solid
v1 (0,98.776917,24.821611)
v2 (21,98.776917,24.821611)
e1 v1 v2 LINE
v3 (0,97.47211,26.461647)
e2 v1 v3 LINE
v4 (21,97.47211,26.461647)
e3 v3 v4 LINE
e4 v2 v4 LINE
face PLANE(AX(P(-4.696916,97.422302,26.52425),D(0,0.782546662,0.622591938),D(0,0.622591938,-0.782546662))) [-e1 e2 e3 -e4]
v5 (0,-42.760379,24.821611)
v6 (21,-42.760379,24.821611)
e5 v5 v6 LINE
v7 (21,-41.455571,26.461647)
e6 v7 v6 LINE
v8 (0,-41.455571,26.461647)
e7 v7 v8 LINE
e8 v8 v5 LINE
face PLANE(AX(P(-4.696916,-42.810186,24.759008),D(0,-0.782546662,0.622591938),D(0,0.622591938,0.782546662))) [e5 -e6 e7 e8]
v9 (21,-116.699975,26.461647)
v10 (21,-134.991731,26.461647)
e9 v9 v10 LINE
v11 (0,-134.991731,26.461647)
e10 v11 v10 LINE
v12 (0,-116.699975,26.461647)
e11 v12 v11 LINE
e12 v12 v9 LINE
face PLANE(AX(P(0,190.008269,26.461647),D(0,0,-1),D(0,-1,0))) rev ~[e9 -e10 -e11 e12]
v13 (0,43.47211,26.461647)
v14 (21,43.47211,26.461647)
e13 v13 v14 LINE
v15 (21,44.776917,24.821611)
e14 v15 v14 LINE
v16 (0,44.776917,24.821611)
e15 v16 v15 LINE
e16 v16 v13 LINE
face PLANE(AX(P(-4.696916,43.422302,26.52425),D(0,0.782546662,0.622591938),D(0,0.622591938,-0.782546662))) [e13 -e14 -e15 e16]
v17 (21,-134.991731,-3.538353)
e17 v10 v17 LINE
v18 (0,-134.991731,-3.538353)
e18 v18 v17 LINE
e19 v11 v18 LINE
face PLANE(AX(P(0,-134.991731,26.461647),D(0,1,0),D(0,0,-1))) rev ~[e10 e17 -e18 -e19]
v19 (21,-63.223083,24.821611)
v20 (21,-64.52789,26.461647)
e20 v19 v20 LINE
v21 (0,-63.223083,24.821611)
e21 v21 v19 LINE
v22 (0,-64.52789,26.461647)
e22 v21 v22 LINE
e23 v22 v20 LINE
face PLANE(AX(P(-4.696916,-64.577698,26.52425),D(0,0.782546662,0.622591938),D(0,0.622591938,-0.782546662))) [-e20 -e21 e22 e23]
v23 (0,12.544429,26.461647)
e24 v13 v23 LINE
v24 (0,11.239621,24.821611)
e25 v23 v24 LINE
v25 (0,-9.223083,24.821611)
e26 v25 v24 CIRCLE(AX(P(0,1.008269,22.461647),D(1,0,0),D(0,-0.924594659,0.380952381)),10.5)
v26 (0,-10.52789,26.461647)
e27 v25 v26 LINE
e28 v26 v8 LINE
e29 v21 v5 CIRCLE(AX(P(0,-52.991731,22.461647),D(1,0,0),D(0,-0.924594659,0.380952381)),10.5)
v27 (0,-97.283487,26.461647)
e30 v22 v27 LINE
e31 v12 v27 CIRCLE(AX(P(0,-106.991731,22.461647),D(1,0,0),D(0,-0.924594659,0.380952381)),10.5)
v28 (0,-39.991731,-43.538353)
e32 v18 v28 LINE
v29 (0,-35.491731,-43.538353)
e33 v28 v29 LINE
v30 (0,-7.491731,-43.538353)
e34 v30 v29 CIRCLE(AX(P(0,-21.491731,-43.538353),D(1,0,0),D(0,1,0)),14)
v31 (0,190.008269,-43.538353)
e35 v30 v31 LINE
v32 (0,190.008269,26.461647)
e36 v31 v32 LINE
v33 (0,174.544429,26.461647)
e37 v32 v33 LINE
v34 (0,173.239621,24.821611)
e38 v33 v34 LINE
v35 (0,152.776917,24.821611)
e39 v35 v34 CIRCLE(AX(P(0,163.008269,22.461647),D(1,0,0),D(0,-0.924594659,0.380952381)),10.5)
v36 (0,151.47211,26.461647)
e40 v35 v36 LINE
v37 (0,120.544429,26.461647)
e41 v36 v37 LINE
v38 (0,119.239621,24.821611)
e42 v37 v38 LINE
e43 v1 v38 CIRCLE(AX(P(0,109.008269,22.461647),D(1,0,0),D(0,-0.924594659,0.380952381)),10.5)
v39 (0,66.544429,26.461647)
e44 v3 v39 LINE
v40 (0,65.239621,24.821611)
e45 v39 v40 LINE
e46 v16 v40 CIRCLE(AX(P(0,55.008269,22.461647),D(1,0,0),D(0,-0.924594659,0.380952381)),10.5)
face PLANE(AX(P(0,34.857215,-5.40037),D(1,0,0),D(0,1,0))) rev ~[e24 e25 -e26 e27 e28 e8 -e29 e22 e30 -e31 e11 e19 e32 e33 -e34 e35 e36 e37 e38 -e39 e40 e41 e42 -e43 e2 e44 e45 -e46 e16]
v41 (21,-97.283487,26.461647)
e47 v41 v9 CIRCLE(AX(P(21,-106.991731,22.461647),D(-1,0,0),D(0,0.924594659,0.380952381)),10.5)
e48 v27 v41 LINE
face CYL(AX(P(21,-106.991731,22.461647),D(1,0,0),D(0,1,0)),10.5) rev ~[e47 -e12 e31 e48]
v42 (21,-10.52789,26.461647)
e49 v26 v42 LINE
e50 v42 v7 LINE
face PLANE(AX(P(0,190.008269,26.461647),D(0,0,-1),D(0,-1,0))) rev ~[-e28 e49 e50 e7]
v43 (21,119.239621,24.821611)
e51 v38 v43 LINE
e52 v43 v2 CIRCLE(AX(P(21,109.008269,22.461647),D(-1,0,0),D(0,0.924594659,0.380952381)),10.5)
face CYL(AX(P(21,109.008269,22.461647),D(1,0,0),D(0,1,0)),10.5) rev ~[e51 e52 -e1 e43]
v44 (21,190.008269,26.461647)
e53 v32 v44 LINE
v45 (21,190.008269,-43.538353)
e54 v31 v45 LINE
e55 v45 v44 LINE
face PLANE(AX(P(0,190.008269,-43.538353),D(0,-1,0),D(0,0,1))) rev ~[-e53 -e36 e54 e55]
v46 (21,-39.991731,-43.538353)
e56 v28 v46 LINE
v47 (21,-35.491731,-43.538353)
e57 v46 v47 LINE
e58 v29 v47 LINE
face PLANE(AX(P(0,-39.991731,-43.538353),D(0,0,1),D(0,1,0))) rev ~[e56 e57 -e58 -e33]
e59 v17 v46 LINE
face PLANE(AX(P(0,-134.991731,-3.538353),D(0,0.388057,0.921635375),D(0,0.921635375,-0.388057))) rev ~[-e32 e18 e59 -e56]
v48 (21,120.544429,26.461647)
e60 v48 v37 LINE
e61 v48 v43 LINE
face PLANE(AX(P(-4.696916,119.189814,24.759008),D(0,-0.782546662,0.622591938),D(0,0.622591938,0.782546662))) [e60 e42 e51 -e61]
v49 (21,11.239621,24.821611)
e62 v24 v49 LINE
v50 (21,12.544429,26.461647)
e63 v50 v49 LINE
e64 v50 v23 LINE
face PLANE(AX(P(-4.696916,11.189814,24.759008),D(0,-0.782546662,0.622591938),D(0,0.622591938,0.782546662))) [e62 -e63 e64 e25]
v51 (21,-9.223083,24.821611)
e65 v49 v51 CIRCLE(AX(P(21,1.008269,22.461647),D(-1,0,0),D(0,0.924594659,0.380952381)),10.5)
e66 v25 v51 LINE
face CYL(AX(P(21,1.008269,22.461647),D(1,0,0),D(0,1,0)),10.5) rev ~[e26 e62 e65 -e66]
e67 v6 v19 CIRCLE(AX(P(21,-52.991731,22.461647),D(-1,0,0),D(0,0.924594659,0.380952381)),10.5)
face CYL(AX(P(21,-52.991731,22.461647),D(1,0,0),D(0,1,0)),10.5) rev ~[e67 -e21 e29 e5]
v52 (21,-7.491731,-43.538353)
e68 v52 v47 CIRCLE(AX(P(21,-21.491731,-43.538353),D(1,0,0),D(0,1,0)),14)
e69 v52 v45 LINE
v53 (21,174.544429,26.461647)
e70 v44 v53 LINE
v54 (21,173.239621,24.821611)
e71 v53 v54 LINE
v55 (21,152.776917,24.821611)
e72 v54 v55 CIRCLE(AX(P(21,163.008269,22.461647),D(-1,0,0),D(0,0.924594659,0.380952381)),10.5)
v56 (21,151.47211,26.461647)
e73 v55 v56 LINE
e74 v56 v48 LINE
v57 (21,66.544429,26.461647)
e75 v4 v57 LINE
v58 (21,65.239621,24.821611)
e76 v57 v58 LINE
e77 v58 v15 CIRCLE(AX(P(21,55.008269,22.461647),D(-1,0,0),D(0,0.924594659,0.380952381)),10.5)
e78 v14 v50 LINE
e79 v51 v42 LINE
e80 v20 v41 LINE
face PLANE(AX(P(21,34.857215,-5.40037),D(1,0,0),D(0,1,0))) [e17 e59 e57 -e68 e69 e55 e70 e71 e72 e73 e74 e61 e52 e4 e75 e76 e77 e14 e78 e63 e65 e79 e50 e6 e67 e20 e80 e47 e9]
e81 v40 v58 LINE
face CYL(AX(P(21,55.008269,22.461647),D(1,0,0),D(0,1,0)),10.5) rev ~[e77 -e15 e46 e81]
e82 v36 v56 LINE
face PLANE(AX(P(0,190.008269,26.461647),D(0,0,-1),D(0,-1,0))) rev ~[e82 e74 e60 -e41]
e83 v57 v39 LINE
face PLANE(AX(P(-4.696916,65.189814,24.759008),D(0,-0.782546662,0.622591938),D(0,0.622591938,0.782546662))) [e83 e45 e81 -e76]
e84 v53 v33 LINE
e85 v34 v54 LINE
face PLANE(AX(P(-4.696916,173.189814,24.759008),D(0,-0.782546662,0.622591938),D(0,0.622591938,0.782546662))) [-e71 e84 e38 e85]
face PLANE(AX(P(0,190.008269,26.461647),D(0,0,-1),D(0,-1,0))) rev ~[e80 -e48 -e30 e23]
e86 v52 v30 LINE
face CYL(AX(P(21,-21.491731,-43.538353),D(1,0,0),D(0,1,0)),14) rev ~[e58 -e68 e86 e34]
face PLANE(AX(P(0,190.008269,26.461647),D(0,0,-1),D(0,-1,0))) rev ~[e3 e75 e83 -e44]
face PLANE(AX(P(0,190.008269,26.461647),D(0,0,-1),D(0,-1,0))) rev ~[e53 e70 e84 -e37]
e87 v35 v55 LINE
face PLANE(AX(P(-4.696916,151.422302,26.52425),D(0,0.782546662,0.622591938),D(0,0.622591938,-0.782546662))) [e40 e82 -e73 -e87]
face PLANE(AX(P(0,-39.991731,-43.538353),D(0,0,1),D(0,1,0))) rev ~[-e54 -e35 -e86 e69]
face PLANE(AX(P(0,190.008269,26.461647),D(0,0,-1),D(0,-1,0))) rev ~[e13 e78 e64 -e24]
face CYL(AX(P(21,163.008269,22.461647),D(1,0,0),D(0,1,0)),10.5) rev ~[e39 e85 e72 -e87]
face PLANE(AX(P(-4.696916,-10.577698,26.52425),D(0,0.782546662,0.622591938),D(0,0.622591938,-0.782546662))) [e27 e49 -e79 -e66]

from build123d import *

# Parameters (mm, degrees)
F1_DEPTH    = 21
F2_R        = 10.5
F3_DEPTH    = 25
F4_T1_DEPTH = 30.3938312155
F5_R        = 14
F6_DEPTH    = 25


# Not quite as in the source:
# - a fillet or chamfer that OpenCascade refuses, or shapes differently, is made with other operations: its cross-section is extruded or revolved along the edge and cut away or added


with BuildPart() as f1:
    # F0 (on Right) → F1 (new body)
    with BuildSketch(Plane.YZ):
        Polygon((-134.9917307664, 26.4616465569), (-134.9917307664, -3.5383534431), (-39.9917307664, -43.5383534431), (190.0082692336, -43.5383534431), (190.0082692336, 26.4616465569), align=None)
    extrude(amount=F1_DEPTH)

    # F2 (on face) → F3 (cut)
    with BuildSketch(Plane.YZ.offset(21)):
        with Locations((163.0082692336, 22.4616465569)):
            Circle(F2_R)
        with Locations((109.0082692336, 22.4616465569)):
            Circle(F2_R)
        with Locations((55.0082692336, 22.4616465569)):
            Circle(F2_R)
        with Locations((1.0082692336, 22.4616465569)):
            Circle(F2_R)
        with Locations((-52.9917307664, 22.4616465569)):
            Circle(F2_R)
        with Locations((-106.9917307664, 22.4616465569)):
            Circle(F2_R)
    extrude(amount=-F3_DEPTH, mode=Mode.SUBTRACT)

    # F4: chamfer of 2 on 10 edges, made by hand

    # F4_s2 → F4_t1 (cut)
    with BuildSketch(Plane.YZ.offset(-4.6969156077)):
        with BuildLine():
            Line((-64.5776976071, 26.5242502898), (-63.1732755163, 24.7590076766))
            Line((-63.1732755163, 24.7590076766), (-63.1342989368, 24.7500173343))
            ThreePointArc((-63.1342989368, 24.7500173343), (-62.963845112, 25.6189453198), (-62.6629908996, 26.4464084616))
            Line((-62.6629908996, 26.4464084616), (-62.6999746859, 26.5016465569))
            ThreePointArc((-62.6999746859, 26.5016465569), (-63.6388361465, 26.5016465569), (-64.5776976071, 26.5642502898))
            Line((-64.5776976071, 26.5642502898), (-64.5776976071, 26.5242502898))
        make_face()
        with BuildLine():
            Line((-42.8101860166, 24.7590076766), (-41.4057639258, 26.5242502898))
            Line((-41.4057639258, 26.5242502898), (-41.4057639258, 26.5642502898))
            ThreePointArc((-41.4057639258, 26.5642502898), (-42.3446253864, 26.5016465569), (-43.283486847, 26.5016465569))
            Line((-43.283486847, 26.5016465569), (-43.3204706333, 26.4464084616))
            ThreePointArc((-43.3204706333, 26.4464084616), (-43.0196164209, 25.6189453198), (-42.8491625961, 24.7500173343))
            Line((-42.8491625961, 24.7500173343), (-42.8101860166, 24.7590076766))
        make_face()
        with BuildLine():
            Line((-10.5776976071, 26.5242502898), (-9.1732755163, 24.7590076766))
            Line((-9.1732755163, 24.7590076766), (-9.1342989368, 24.7500173343))
            ThreePointArc((-9.1342989368, 24.7500173343), (-8.963845112, 25.6189453198), (-8.6629908996, 26.4464084616))
            Line((-8.6629908996, 26.4464084616), (-8.6999746859, 26.5016465569))
            ThreePointArc((-8.6999746859, 26.5016465569), (-9.6388361465, 26.5016465569), (-10.5776976071, 26.5642502898))
            Line((-10.5776976071, 26.5642502898), (-10.5776976071, 26.5242502898))
        make_face()
        with BuildLine():
            Line((11.1898139834, 24.7590076766), (12.5942360742, 26.5242502898))
            Line((12.5942360742, 26.5242502898), (12.5942360742, 26.5642502898))
            ThreePointArc((12.5942360742, 26.5642502898), (11.6553746136, 26.5016465569), (10.716513153, 26.5016465569))
            Line((10.716513153, 26.5016465569), (10.6795293667, 26.4464084616))
            ThreePointArc((10.6795293667, 26.4464084616), (10.9803835791, 25.6189453198), (11.1508374039, 24.7500173343))
            Line((11.1508374039, 24.7500173343), (11.1898139834, 24.7590076766))
        make_face()
        with BuildLine():
            Line((43.4223023929, 26.5242502898), (44.8267244837, 24.7590076766))
            Line((44.8267244837, 24.7590076766), (44.8657010632, 24.7500173343))
            ThreePointArc((44.8657010632, 24.7500173343), (45.036154888, 25.6189453198), (45.3370091004, 26.4464084616))
            Line((45.3370091004, 26.4464084616), (45.3000253141, 26.5016465569))
            ThreePointArc((45.3000253141, 26.5016465569), (44.3611638535, 26.5016465569), (43.4223023929, 26.5642502898))
            Line((43.4223023929, 26.5642502898), (43.4223023929, 26.5242502898))
        make_face()
        with BuildLine():
            Line((65.1898139834, 24.7590076766), (66.5942360742, 26.5242502898))
            Line((66.5942360742, 26.5242502898), (66.5942360742, 26.5642502898))
            ThreePointArc((66.5942360742, 26.5642502898), (65.6553746136, 26.5016465569), (64.716513153, 26.5016465569))
            Line((64.716513153, 26.5016465569), (64.6795293667, 26.4464084616))
            ThreePointArc((64.6795293667, 26.4464084616), (64.9803835791, 25.6189453198), (65.1508374039, 24.7500173343))
            Line((65.1508374039, 24.7500173343), (65.1898139834, 24.7590076766))
        make_face()
        with BuildLine():
            Line((97.4223023929, 26.5242502898), (98.8267244837, 24.7590076766))
            Line((98.8267244837, 24.7590076766), (98.8657010632, 24.7500173343))
            ThreePointArc((98.8657010632, 24.7500173343), (99.036154888, 25.6189453198), (99.3370091004, 26.4464084616))
            Line((99.3370091004, 26.4464084616), (99.3000253141, 26.5016465569))
            ThreePointArc((99.3000253141, 26.5016465569), (98.3611638535, 26.5016465569), (97.4223023929, 26.5642502898))
            Line((97.4223023929, 26.5642502898), (97.4223023929, 26.5242502898))
        make_face()
        with BuildLine():
            Line((119.1898139834, 24.7590076766), (120.5942360742, 26.5242502898))
            Line((120.5942360742, 26.5242502898), (120.5942360742, 26.5642502898))
            ThreePointArc((120.5942360742, 26.5642502898), (119.6553746136, 26.5016465569), (118.716513153, 26.5016465569))
            Line((118.716513153, 26.5016465569), (118.6795293667, 26.4464084616))
            ThreePointArc((118.6795293667, 26.4464084616), (118.9803835791, 25.6189453198), (119.1508374039, 24.7500173343))
            Line((119.1508374039, 24.7500173343), (119.1898139834, 24.7590076766))
        make_face()
        with BuildLine():
            Line((151.4223023929, 26.5242502898), (152.8267244837, 24.7590076766))
            Line((152.8267244837, 24.7590076766), (152.8657010632, 24.7500173343))
            ThreePointArc((152.8657010632, 24.7500173343), (153.036154888, 25.6189453198), (153.3370091004, 26.4464084616))
            Line((153.3370091004, 26.4464084616), (153.3000253141, 26.5016465569))
            ThreePointArc((153.3000253141, 26.5016465569), (152.3611638535, 26.5016465569), (151.4223023929, 26.5642502898))
            Line((151.4223023929, 26.5642502898), (151.4223023929, 26.5242502898))
        make_face()
        with BuildLine():
            Line((173.1898139834, 24.7590076766), (174.5942360742, 26.5242502898))
            Line((174.5942360742, 26.5242502898), (174.5942360742, 26.5642502898))
            ThreePointArc((174.5942360742, 26.5642502898), (173.6553746136, 26.5016465569), (172.716513153, 26.5016465569))
            Line((172.716513153, 26.5016465569), (172.6795293667, 26.4464084616))
            ThreePointArc((172.6795293667, 26.4464084616), (172.9803835791, 25.6189453198), (173.1508374039, 24.7500173343))
            Line((173.1508374039, 24.7500173343), (173.1898139834, 24.7590076766))
        make_face()
    extrude(amount=F4_T1_DEPTH, mode=Mode.SUBTRACT)

    # F5 (on face) → F6 (cut)
    with BuildSketch(Plane.YZ.offset(21)):
        with Locations((-21.4917307664, -43.5383534431)):
            Circle(F5_R)
    extrude(amount=-F6_DEPTH, mode=Mode.SUBTRACT)


solid = f1.part
